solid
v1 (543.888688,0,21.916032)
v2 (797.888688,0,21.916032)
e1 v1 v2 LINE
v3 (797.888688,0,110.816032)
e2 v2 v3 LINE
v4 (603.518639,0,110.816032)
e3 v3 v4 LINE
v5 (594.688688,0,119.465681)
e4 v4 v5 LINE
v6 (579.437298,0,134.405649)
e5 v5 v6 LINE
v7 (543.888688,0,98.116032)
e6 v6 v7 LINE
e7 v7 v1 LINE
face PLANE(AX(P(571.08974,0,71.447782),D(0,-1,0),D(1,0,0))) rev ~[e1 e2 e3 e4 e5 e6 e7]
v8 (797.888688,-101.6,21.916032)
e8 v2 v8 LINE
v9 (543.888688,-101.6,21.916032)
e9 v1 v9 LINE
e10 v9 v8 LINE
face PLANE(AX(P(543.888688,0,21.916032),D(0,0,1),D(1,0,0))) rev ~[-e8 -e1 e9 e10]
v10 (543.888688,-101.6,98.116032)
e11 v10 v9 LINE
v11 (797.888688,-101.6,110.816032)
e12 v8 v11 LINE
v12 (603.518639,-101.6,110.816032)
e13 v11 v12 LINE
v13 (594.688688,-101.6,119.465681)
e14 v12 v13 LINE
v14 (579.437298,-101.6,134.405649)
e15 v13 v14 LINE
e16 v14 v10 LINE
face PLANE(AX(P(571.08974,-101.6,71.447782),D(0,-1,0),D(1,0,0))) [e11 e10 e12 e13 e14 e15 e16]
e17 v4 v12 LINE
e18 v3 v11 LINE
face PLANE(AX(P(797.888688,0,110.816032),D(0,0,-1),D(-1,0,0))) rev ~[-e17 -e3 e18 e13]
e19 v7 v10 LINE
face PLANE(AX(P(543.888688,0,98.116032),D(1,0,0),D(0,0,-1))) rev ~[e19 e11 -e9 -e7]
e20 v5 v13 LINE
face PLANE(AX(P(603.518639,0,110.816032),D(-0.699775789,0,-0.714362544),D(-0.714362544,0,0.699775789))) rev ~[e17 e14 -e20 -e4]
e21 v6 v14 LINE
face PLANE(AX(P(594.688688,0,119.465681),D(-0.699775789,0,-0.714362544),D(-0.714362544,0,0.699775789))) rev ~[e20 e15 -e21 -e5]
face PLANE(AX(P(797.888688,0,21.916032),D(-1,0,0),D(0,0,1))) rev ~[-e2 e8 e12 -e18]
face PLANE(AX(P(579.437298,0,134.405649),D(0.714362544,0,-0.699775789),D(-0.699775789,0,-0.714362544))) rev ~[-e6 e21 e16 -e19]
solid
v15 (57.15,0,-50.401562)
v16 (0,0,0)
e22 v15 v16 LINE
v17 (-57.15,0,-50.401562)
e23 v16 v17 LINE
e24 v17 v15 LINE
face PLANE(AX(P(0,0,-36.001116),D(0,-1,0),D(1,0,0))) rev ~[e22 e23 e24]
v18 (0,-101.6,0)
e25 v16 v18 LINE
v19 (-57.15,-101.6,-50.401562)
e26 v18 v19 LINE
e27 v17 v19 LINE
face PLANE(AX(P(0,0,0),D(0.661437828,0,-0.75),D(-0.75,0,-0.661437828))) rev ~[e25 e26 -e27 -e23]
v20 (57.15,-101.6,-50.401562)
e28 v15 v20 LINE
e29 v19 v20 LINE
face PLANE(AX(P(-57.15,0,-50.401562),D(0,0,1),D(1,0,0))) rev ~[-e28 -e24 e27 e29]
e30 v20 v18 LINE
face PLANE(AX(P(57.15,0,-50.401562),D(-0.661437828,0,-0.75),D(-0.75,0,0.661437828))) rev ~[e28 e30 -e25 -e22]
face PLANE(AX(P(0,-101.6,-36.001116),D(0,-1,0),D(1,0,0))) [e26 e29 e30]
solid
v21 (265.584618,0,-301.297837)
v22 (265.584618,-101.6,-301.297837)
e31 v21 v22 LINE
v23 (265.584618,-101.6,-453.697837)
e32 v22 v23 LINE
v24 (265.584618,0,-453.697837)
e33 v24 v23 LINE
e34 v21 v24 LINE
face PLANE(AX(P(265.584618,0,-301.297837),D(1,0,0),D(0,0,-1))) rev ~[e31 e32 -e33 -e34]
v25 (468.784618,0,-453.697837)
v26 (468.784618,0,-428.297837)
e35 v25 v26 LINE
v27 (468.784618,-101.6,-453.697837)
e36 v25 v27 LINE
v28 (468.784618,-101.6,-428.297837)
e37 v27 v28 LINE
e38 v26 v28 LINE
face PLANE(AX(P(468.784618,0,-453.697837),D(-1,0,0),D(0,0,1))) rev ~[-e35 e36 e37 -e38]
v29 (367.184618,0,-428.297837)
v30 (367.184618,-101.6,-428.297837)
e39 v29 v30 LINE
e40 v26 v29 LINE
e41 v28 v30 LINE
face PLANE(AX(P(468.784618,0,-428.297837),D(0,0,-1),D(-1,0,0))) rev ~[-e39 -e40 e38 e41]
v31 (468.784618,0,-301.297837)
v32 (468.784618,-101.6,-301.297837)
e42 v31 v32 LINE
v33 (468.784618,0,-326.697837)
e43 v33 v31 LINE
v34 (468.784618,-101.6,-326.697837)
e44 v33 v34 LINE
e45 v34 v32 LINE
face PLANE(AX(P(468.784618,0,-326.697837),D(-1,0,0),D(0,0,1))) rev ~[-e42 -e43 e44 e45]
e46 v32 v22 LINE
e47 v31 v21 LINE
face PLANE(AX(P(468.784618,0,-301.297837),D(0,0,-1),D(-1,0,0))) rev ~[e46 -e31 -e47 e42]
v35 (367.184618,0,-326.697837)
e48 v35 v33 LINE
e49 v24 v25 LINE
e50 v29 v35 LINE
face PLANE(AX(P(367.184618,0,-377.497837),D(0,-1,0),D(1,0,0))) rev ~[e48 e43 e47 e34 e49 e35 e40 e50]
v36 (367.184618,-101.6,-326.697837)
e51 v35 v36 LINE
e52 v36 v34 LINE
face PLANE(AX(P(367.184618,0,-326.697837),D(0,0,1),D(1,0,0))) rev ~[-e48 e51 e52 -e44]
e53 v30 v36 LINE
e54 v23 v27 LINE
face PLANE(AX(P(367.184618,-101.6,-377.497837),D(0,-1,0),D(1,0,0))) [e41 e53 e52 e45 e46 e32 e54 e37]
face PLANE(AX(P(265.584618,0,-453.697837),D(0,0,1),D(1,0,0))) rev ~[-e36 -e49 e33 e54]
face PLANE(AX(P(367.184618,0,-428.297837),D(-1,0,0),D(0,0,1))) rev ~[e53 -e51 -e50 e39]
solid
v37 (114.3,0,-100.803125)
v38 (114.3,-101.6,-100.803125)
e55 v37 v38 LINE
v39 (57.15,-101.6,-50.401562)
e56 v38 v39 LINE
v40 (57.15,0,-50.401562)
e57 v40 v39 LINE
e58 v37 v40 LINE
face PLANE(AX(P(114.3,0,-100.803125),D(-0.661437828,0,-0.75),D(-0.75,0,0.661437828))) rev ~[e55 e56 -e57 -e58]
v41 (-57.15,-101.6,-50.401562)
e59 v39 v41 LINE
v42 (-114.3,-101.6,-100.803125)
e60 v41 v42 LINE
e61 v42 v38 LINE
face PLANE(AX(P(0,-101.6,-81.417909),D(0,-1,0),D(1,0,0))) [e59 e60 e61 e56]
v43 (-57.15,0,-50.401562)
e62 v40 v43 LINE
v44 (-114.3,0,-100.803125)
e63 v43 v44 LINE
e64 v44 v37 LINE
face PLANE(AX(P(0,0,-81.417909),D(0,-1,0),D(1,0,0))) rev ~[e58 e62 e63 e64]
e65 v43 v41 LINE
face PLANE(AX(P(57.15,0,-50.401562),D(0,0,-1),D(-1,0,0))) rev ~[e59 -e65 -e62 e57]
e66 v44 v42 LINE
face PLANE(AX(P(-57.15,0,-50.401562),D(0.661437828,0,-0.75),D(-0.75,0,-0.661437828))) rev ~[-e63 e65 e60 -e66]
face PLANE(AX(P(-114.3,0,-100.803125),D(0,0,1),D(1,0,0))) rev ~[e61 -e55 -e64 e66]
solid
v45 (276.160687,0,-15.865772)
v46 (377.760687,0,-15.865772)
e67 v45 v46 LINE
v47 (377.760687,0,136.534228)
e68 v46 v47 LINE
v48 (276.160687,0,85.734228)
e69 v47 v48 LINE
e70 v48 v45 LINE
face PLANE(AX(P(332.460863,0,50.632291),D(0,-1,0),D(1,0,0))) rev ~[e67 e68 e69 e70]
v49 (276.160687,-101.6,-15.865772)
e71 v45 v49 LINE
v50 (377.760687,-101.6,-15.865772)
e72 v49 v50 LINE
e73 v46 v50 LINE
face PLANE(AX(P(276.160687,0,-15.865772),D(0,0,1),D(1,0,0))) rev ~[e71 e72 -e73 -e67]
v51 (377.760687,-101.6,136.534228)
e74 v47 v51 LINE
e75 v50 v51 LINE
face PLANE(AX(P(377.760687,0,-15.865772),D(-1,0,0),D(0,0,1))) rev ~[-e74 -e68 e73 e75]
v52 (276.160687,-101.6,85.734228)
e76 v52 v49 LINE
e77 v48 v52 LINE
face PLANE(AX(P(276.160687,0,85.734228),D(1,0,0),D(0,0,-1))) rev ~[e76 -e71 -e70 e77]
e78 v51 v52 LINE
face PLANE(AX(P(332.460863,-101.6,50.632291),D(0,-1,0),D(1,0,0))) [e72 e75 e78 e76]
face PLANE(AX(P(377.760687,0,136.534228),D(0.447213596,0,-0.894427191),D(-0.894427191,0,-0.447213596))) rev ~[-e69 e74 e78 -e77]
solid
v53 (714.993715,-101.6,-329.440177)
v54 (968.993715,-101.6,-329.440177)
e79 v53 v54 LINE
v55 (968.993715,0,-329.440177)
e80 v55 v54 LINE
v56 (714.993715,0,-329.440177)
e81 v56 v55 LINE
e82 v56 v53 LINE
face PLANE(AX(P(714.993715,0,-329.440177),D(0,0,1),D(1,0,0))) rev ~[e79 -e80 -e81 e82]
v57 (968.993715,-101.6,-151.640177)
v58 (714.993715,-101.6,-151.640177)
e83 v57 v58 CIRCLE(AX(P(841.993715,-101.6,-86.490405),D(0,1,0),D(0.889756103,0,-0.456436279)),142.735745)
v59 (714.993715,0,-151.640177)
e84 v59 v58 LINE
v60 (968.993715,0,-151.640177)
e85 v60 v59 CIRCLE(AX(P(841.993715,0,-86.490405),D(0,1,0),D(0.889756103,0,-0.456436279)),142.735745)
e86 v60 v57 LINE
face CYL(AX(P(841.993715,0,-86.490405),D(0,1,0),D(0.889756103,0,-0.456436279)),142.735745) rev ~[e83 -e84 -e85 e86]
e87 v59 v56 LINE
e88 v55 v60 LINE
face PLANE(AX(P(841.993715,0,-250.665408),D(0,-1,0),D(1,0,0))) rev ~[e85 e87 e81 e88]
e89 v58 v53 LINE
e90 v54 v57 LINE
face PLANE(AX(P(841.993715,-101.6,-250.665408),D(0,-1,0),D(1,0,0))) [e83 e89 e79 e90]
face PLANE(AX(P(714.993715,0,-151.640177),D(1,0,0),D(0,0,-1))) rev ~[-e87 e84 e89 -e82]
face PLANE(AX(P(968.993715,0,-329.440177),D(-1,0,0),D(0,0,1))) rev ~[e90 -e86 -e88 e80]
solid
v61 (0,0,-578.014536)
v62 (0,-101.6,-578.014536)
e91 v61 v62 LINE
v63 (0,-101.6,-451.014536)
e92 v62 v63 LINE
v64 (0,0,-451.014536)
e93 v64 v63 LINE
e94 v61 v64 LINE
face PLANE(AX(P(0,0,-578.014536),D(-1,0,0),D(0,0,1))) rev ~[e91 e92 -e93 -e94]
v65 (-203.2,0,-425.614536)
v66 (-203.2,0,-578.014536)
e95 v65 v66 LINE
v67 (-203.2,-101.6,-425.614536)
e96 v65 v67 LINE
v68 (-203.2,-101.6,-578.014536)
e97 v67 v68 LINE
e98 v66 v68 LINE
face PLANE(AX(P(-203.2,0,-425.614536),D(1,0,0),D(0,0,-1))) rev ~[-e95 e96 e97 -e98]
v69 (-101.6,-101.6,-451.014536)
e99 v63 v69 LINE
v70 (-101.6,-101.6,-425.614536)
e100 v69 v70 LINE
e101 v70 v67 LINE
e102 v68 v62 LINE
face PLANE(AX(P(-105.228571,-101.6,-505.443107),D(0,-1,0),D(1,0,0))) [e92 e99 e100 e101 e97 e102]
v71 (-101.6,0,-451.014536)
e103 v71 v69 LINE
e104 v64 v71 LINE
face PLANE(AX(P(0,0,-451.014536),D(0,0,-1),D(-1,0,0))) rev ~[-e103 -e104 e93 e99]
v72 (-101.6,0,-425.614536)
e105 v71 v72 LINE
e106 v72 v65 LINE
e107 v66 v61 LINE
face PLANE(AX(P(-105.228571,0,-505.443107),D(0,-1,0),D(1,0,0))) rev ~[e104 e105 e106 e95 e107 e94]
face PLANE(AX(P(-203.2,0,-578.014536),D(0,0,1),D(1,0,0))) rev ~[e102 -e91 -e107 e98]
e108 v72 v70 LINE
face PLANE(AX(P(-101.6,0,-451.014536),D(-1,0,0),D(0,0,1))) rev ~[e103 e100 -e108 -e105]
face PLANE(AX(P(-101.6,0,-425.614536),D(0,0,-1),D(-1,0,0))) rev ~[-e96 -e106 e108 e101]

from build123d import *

# Parameters (mm, degrees)
F2_DEPTH  = 101.6
F4_DEPTH  = 101.6
F6_DEPTH  = 101.6
F8_DEPTH  = 101.6
F10_DEPTH = 101.6


with BuildPart() as f2:
    # F0 (on Front) → F2 (new body)
    with BuildSketch(Plane.XZ):
        Polygon((57.15, -50.4015624758), (0, 0), (-57.15, -50.4015624758), align=None)
    extrude(amount=F2_DEPTH)


with BuildPart() as f2b:
    # F1 (on face) → F2, piece 2 (new body)
    with BuildSketch(Plane.XZ):
        Polygon((114.3, -100.8031249516), (57.15, -50.4015624758), (-57.15, -50.4015624758), (-114.3, -100.8031249516), align=None)
    extrude(amount=F2_DEPTH)


with BuildPart() as f4:
    # F3 (on Front) → F4 (new body)
    with BuildSketch(Plane.XZ):
        Polygon((377.7606872082, -15.8657720208), (377.7606872082, 136.5342279792), (276.1606872082, 85.7342279792), (276.1606872082, -15.8657720208), align=None)
    extrude(amount=F4_DEPTH)


with BuildPart() as f4b:
    # F3 (on Front) → F4, piece 2 (new body)
    with BuildSketch(Plane.XZ):
        Polygon((543.8886880875, 98.1160318375), (543.8886880875, 21.9160318375), (594.6886880875, 21.9160318375), (594.6886880875, 72.7160318375), (594.6886880875, 119.4656812943), (579.4372981796, 134.4056490925), align=None)
        Polygon((603.5186386078, 110.8160318375), (642.4128292338, 72.7160318375), (797.8886880875, 72.7160318375), (797.8886880875, 110.8160318375), align=None)
        Polygon((594.6886880875, 72.7160318375), (594.6886880875, 21.9160318375), (645.4886880875, 21.9160318375), (797.8886880875, 21.9160318375), (797.8886880875, 72.7160318375), (642.4128292338, 72.7160318375), align=None)
        Polygon((594.6886880875, 119.4656812943), (594.6886880875, 72.7160318375), (642.4128292338, 72.7160318375), (603.5186386078, 110.8160318375), align=None)
    extrude(amount=F4_DEPTH)


with BuildPart() as f6:
    # F5 (on Front) → F6 (new body)
    with BuildSketch(Plane.XZ):
        Polygon((-101.6, -425.6145358086), (-203.2, -425.6145358086), (-203.2, -578.0145358086), (0, -578.0145358086), (0, -451.0145358086), (-101.6, -451.0145358086), align=None)
    extrude(amount=F6_DEPTH)


with BuildPart() as f8:
    # F7 (on Front) → F8 (new body)
    with BuildSketch(Plane.XZ):
        Polygon((468.7846178532, -301.2978369474), (265.5846178532, -301.2978369474), (265.5846178532, -453.6978369474), (468.7846178532, -453.6978369474), (468.7846178532, -428.2978369474), (367.1846178532, -428.2978369474), (367.1846178532, -326.6978369474), (468.7846178532, -326.6978369474), align=None)
    extrude(amount=F8_DEPTH)


with BuildPart() as f10:
    # F9 (on Front) → F10 (new body)
    with BuildSketch(Plane.XZ):
        with BuildLine():
            ThreePointArc((968.9937152863, -151.64017663), (841.9937152863, -229.2261491845), (714.9937152863, -151.64017663))
            Line((714.9937152863, -151.64017663), (714.9937152863, -329.44017663))
            Line((714.9937152863, -329.44017663), (968.9937152863, -329.44017663))
            Line((968.9937152863, -329.44017663), (968.9937152863, -151.64017663))
        make_face()
    extrude(amount=F10_DEPTH)


solid = Compound([f2.part, f2b.part, f4.part, f4b.part, f6.part, f8.part, f10.part])
